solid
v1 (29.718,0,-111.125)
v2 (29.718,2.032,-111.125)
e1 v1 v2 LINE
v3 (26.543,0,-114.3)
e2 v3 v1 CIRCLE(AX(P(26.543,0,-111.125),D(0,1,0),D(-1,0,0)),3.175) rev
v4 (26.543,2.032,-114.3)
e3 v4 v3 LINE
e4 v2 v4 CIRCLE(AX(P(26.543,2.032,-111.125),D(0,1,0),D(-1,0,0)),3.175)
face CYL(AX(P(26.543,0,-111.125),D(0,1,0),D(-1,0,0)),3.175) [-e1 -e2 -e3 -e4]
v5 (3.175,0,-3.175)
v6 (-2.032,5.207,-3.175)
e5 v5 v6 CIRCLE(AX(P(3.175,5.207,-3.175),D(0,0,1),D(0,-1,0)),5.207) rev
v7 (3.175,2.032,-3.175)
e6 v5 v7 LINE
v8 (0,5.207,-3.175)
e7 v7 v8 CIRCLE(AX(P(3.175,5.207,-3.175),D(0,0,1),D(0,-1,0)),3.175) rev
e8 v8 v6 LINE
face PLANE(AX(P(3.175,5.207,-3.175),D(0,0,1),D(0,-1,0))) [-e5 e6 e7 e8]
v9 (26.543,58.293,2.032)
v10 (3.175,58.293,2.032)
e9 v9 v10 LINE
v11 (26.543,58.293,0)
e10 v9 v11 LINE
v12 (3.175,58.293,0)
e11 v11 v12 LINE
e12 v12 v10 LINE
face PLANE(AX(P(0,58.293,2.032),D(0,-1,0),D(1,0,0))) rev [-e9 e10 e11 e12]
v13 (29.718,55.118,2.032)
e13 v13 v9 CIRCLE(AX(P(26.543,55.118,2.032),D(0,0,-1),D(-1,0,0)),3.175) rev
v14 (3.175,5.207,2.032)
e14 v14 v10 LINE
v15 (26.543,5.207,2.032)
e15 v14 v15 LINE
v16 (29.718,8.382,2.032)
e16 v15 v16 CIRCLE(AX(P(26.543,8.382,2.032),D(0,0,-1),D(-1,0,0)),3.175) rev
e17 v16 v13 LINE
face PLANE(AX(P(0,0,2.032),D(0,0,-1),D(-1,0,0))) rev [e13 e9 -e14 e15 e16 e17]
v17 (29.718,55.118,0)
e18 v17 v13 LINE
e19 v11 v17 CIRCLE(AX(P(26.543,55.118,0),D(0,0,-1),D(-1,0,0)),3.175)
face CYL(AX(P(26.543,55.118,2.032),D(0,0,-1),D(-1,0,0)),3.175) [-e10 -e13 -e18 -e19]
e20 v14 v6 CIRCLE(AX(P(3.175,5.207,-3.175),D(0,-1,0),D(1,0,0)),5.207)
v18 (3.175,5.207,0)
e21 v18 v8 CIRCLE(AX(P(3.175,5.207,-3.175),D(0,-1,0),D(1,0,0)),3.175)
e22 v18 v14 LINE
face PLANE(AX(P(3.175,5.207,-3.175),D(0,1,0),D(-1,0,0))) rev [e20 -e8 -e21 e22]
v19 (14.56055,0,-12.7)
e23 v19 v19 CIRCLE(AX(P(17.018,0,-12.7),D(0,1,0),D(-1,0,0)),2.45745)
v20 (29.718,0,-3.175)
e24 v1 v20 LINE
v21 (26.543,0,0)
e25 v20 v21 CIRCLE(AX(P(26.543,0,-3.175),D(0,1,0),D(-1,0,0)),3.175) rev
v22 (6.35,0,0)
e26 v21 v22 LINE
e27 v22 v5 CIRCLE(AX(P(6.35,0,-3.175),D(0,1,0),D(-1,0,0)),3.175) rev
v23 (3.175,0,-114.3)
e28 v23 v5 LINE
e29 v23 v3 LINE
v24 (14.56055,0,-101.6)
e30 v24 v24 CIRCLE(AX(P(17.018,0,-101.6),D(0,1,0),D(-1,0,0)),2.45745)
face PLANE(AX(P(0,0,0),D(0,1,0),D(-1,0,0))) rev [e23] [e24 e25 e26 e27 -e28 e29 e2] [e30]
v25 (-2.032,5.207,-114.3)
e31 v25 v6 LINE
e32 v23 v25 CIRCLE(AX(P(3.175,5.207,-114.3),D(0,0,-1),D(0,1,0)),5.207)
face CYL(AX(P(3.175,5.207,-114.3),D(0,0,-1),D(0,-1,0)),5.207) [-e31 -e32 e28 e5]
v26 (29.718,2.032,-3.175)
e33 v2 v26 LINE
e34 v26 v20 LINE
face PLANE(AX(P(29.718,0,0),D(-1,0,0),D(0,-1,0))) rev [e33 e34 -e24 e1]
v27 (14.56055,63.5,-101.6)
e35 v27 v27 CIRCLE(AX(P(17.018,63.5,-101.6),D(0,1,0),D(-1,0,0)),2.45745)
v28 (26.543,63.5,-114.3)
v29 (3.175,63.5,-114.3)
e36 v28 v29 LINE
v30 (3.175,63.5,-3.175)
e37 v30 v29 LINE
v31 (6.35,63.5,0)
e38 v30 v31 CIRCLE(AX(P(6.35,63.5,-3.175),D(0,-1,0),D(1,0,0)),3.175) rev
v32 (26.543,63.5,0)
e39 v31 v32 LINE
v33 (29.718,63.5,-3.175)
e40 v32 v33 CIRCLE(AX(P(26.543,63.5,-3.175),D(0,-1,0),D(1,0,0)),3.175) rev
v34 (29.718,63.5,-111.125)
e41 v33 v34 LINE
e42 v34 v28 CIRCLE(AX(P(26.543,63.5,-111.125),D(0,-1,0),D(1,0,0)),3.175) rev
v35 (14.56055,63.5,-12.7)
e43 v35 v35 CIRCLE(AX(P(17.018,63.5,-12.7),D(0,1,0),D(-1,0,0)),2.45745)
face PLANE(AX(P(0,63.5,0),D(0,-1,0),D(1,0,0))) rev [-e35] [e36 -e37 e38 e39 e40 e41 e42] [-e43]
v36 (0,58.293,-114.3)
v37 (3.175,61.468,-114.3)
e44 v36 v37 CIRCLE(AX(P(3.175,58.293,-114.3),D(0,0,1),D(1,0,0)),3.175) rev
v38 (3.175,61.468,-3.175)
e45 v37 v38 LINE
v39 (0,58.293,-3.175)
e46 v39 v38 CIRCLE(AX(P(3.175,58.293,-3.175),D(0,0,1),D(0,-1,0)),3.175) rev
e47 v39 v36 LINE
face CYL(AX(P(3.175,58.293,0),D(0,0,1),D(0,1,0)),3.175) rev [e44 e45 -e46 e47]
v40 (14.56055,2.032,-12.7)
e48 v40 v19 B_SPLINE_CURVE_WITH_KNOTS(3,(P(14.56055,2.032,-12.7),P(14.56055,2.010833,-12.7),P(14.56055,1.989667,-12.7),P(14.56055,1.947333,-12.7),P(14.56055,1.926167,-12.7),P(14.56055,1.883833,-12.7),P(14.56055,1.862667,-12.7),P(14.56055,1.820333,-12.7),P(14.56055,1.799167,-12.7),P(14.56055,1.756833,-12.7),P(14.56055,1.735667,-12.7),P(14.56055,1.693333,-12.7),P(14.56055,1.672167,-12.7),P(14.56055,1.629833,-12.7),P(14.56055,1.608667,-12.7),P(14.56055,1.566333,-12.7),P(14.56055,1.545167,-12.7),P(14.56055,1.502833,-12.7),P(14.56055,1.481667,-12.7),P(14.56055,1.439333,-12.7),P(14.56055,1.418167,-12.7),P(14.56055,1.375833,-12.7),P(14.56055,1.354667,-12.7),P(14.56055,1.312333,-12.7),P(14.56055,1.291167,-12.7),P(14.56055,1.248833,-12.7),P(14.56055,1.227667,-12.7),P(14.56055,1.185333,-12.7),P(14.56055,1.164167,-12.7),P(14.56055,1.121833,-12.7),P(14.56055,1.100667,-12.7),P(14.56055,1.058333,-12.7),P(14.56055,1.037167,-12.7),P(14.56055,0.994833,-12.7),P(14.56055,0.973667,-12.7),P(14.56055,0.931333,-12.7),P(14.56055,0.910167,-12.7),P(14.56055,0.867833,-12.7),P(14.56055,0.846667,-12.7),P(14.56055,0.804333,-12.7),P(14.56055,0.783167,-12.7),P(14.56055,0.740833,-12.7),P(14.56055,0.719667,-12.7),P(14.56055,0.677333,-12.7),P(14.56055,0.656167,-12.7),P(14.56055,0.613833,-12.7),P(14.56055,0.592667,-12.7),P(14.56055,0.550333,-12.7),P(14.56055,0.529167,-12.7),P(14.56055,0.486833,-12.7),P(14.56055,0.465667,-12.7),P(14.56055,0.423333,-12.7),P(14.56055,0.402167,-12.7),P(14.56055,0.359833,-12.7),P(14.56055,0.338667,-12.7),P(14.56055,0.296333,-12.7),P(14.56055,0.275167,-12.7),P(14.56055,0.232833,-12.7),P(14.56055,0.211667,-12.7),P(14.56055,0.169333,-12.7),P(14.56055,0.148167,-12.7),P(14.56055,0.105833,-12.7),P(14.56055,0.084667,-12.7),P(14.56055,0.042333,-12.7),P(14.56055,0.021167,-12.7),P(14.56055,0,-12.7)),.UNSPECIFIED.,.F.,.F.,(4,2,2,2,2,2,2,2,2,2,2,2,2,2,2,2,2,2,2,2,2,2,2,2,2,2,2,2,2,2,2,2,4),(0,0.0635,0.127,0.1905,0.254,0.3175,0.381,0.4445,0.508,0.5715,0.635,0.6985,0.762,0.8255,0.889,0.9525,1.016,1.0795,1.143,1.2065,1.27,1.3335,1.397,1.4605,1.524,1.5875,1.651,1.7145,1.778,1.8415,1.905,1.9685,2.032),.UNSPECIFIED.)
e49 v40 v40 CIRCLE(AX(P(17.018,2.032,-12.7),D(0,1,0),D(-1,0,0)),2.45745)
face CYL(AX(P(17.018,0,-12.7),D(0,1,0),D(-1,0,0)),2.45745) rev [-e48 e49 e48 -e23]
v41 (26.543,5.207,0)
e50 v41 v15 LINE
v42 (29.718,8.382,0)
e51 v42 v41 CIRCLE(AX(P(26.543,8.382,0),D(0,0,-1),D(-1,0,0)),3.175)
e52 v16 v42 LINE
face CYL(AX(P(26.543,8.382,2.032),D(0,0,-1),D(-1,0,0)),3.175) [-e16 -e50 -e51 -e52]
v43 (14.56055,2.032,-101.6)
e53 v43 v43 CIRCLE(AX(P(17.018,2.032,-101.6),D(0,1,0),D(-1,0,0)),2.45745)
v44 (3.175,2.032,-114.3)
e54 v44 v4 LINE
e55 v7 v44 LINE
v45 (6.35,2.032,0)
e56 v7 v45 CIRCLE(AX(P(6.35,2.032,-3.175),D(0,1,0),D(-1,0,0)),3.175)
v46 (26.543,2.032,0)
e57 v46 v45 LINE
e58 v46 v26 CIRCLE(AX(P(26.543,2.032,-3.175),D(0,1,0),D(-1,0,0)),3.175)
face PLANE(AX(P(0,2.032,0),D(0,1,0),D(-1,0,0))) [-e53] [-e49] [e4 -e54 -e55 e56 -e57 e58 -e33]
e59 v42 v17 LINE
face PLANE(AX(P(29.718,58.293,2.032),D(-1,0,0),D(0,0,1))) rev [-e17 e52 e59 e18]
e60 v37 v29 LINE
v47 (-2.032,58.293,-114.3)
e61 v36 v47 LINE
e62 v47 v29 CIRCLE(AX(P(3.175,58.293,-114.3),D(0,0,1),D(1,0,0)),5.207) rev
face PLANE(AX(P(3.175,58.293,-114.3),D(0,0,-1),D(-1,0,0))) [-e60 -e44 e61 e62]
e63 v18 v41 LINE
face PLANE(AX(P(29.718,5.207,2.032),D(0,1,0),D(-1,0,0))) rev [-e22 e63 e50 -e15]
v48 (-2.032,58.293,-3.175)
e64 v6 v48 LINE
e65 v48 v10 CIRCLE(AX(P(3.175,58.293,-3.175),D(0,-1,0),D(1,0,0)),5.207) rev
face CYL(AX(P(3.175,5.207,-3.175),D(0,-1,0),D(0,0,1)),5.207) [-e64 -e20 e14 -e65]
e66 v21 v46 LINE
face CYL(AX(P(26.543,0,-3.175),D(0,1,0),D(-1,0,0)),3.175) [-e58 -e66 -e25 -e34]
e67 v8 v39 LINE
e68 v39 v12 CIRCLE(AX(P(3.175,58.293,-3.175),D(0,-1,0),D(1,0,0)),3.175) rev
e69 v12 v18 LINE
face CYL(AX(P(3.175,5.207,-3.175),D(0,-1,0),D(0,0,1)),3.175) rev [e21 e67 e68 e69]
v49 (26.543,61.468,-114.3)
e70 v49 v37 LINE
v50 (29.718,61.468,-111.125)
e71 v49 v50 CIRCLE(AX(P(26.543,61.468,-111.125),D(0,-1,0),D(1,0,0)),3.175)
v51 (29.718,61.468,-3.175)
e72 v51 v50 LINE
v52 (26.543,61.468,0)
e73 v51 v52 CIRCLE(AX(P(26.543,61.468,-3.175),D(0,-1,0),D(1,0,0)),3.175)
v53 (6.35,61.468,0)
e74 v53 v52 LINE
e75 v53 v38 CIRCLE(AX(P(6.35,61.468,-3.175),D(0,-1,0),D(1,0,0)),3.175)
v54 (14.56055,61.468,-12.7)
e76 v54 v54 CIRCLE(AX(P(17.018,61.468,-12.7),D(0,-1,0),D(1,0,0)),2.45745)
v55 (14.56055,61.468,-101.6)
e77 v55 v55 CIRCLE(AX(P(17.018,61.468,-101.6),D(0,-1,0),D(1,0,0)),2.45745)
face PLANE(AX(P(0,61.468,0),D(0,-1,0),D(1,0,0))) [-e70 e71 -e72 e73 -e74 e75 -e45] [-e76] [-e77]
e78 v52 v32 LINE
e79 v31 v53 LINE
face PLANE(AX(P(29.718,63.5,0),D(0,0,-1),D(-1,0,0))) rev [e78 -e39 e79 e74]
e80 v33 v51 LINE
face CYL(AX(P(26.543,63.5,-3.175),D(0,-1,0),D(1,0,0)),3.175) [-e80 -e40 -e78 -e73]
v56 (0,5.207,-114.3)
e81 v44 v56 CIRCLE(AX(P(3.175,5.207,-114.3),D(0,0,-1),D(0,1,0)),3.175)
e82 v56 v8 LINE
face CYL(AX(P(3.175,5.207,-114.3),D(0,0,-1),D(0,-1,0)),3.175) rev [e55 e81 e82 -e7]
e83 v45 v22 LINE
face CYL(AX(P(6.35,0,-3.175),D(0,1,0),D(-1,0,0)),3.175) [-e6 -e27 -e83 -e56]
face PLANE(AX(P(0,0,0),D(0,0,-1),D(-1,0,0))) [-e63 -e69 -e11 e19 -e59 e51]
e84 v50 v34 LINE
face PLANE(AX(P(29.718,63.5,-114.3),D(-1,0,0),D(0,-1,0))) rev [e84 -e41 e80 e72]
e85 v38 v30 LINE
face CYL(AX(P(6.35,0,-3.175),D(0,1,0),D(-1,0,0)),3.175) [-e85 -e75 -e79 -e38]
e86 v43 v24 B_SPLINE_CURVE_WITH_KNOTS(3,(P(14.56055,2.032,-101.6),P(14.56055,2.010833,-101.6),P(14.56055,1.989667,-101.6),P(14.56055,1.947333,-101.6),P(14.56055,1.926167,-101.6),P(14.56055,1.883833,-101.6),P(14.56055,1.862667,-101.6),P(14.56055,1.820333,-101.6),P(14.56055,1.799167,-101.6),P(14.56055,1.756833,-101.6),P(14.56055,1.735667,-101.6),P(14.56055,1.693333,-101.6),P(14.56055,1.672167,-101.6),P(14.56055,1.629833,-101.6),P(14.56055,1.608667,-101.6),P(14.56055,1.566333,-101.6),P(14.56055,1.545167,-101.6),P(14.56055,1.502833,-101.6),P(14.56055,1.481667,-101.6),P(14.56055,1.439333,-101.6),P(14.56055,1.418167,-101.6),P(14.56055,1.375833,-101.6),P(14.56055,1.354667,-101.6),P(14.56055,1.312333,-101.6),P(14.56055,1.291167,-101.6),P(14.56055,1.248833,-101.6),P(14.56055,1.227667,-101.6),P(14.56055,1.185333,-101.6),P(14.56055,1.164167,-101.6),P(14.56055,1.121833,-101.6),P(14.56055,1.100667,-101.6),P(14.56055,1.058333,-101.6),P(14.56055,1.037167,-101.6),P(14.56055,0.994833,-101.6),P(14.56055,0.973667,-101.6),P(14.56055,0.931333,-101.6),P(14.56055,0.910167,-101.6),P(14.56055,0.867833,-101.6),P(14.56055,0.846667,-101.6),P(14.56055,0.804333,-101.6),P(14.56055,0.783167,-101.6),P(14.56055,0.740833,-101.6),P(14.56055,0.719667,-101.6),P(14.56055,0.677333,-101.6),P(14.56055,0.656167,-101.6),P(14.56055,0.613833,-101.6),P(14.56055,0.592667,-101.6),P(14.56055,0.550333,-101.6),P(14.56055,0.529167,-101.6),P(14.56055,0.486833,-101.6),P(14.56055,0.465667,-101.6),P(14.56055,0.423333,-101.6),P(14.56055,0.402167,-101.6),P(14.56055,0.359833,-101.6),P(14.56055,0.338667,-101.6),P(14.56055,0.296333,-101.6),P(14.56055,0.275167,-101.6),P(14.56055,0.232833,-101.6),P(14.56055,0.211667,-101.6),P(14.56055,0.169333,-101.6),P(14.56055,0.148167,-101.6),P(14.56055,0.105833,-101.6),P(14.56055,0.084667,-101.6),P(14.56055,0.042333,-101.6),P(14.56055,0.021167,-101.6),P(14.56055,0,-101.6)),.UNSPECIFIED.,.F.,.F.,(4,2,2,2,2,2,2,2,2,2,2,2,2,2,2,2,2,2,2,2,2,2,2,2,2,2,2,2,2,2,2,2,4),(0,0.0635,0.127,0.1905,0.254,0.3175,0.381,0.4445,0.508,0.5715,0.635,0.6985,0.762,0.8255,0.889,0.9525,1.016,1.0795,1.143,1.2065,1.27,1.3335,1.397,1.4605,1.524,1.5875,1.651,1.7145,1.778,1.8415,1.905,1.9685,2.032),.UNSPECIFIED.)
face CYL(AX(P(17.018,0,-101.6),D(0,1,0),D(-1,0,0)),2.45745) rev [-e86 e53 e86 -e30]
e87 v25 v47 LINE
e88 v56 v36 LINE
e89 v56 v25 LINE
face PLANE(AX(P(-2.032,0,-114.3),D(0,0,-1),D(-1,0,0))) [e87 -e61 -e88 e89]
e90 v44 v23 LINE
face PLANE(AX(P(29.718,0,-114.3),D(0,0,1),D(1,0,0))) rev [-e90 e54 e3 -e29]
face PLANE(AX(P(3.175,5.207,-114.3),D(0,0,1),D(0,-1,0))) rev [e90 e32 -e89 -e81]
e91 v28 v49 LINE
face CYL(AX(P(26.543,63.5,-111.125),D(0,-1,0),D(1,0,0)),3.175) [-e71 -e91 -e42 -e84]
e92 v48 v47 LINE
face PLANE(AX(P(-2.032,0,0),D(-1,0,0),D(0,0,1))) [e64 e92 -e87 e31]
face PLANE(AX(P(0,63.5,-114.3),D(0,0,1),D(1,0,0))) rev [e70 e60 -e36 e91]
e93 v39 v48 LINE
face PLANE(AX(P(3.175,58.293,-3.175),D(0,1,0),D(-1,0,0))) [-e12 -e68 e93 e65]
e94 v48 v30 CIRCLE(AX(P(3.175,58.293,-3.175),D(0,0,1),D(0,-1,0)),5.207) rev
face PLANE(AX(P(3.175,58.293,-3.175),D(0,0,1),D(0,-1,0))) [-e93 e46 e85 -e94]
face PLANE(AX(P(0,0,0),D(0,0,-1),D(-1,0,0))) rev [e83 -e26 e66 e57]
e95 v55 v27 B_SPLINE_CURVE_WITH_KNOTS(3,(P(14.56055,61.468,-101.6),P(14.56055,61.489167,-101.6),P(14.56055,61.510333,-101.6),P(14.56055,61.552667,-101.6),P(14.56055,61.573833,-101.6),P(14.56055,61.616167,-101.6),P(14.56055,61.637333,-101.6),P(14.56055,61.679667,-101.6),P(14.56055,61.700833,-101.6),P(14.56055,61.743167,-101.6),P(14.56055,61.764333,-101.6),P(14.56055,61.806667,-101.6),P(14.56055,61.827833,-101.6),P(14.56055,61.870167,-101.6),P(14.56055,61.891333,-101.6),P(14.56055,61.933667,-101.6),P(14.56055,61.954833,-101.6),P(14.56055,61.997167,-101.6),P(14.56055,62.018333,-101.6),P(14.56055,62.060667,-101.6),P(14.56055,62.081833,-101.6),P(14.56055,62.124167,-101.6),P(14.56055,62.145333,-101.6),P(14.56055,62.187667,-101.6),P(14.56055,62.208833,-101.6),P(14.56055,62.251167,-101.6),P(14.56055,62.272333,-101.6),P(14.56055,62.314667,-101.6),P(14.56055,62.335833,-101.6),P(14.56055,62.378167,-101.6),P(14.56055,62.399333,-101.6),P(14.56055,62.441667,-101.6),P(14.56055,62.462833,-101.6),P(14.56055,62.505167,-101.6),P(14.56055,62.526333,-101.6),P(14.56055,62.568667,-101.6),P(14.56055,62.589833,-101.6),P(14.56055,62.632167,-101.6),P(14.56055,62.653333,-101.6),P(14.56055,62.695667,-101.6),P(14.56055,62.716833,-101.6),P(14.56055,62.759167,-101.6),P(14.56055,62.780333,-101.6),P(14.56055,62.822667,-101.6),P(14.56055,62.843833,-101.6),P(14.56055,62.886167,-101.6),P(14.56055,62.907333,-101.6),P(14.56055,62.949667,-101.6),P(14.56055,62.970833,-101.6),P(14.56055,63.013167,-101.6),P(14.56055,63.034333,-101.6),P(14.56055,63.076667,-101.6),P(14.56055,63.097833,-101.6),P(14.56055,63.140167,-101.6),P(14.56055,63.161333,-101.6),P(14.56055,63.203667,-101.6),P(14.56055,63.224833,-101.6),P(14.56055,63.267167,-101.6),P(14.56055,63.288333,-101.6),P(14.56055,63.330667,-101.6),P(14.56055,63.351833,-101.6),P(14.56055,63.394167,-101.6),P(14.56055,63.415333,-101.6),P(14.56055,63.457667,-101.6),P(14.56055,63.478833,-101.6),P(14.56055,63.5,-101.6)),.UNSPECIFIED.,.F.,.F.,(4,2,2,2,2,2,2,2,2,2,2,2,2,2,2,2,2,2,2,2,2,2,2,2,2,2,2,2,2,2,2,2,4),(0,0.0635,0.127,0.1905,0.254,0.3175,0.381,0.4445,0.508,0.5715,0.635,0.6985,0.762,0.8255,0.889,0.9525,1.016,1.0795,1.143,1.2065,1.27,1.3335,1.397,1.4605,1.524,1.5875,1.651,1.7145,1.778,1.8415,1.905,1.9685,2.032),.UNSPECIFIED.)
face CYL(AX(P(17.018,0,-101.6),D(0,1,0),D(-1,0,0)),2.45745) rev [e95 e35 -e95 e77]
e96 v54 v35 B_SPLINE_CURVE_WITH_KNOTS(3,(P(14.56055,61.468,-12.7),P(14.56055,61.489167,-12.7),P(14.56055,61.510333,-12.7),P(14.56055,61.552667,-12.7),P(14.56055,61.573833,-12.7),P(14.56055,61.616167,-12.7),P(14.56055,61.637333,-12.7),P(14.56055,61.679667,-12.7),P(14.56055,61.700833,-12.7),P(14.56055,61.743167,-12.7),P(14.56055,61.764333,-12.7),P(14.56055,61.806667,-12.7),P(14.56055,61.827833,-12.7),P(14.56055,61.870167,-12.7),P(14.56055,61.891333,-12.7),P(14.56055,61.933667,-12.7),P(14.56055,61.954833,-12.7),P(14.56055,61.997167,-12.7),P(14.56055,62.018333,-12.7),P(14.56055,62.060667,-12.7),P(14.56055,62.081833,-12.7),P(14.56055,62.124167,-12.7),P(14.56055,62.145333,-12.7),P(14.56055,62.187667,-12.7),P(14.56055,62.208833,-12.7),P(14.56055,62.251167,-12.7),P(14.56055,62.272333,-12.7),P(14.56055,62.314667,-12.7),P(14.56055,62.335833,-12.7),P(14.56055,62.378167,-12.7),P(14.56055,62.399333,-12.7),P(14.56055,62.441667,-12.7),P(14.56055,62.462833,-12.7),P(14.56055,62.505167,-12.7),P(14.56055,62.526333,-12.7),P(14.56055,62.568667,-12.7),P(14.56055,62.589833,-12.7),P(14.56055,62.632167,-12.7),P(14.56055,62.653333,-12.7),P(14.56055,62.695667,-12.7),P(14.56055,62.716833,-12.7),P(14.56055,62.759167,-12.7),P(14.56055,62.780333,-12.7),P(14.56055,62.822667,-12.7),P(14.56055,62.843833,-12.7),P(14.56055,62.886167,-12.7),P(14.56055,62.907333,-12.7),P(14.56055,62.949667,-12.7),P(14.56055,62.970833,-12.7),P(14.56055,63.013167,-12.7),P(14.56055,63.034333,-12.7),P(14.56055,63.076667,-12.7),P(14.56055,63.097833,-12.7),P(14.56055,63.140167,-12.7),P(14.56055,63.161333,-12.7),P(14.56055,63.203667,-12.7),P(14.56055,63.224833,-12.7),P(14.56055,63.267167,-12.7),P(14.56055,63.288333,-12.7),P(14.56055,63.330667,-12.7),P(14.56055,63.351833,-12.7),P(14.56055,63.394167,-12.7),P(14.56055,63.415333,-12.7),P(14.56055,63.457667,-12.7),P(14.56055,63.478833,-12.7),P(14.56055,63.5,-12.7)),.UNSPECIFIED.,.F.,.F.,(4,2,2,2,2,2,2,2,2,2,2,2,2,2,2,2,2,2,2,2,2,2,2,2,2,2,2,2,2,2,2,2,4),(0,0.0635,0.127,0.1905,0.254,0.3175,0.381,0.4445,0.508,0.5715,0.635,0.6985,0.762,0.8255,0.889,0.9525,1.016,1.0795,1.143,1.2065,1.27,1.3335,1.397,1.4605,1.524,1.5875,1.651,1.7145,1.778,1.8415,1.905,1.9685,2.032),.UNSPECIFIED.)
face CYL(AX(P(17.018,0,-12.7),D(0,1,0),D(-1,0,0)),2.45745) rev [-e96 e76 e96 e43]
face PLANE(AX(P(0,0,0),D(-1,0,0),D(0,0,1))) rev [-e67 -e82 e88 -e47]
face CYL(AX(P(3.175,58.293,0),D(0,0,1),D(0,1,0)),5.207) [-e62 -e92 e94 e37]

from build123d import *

# Parameters (mm, degrees)
SKETCH1_W                      = 114.3
SKETCH1_H                      = 63.5
BASE_FLANGE1_DEPTH             = 2.032
EDGE_FLANGE1_STRIP_W           = 14.478
EDGE_FLANGE1_STRIP_H           = 2.032
EDGE_FLANGE1_STRIP_CUT_DEPTH   = 114.3
EDGE_FLANGE1_STRIP_2_W         = 14.478
EDGE_FLANGE1_STRIP_2_H         = 2.032
EDGE_FLANGE1_STRIP_CUT_2_DEPTH = 114.3
EDGE_FLANGE1_DEPTH             = 114.3
EDGE_FLANGE1_BEND_DEPTH        = 114.3
EDGE_FLANGE2_DEPTH             = 63.5
EDGE_FLANGE2_2_DEPTH           = 5.207
EDGE_FLANGE2_START             = 58.293
EDGE_FLANGE2_3_DEPTH           = 5.207
EDGE_FLANGE2_START_2           = 5.207
EDGE_FLANGE2_4_DEPTH           = 53.086
SKETCH15_R                     = 2.45745
CUT_EXTRUDE1_DEPTH             = 135.089147674
FILLET1_R                      = 3.175


# Read off the part's stored shape, not the designer's step: Edge-Flange2
# Sheet-metal steps are written as plain solids
with BuildPart() as part:
    # Sketch1 → Base-Flange1 (new body)
    with BuildSketch(Plane(origin=(0, 0, 0), x_dir=(0, 0, -1), z_dir=(1, 0, 0))):
        with Locations((57.15, 31.75)):
            Rectangle(SKETCH1_W, SKETCH1_H)
    extrude(amount=-BASE_FLANGE1_DEPTH)

    # Edge-Flange1 strip (across the edge) → Edge-Flange1 strip cut (cut)
    with BuildSketch(Plane(origin=(0, 63.5, -114.3), x_dir=(0, -1, 0), z_dir=(0, 0, 1))):
        with Locations((-2.032, -1.016)):
            Rectangle(EDGE_FLANGE1_STRIP_W, EDGE_FLANGE1_STRIP_H)
    extrude(amount=EDGE_FLANGE1_STRIP_CUT_DEPTH, mode=Mode.SUBTRACT)

    # Edge-Flange1 strip 2 (across the edge) → Edge-Flange1 strip cut 2 (cut)
    with BuildSketch(Plane.YX):
        with Locations((-2.032, -1.016)):
            Rectangle(EDGE_FLANGE1_STRIP_2_W, EDGE_FLANGE1_STRIP_2_H)
    extrude(amount=EDGE_FLANGE1_STRIP_CUT_2_DEPTH, mode=Mode.SUBTRACT)

    # Edge-Flange1 section (across the edge) → Edge-Flange1 (add)
    with BuildSketch(Plane(origin=(0, 63.5, -114.3), x_dir=(0, -1, 0), z_dir=(0, 0, 1))):
        with BuildLine():
            Line((0, 3.175), (0, 29.718))
            Line((0, 29.718), (2.032, 29.718))
            Line((2.032, 29.718), (2.032, 3.175))
            ThreePointArc((2.032, 3.175), (2.96193597, 0.92993597), (5.207, 0))
            Line((5.207, 0), (5.207, -2.032))
            ThreePointArc((5.207, -2.032), (1.52509499, -0.50690501), (0, 3.175))
        make_face()
    extrude(amount=EDGE_FLANGE1_DEPTH)

    # Edge-Flange1 section 2 (across the edge) → Edge-Flange1 bend (add)
    with BuildSketch(Plane.YX):
        with BuildLine():
            Line((0, 3.175), (0, 29.718))
            Line((0, 29.718), (2.032, 29.718))
            Line((2.032, 29.718), (2.032, 3.175))
            ThreePointArc((2.032, 3.175), (2.96193597, 0.92993597), (5.207, 0))
            Line((5.207, 0), (5.207, -2.032))
            ThreePointArc((5.207, -2.032), (1.52509499, -0.50690501), (0, 3.175))
        make_face()
    extrude(amount=EDGE_FLANGE1_BEND_DEPTH)

    # Edge-Flange2 outline → Edge-Flange2 (cut)
    with BuildSketch(Plane(origin=(0, 0, 0), x_dir=(1, 0, 0), z_dir=(0, 1, 0))):
        with BuildLine():
            Line((3.175, 0), (3.175, 3.175))
            Line((3.175, 3.175), (0, 3.175))
            ThreePointArc((0, 3.175), (0.92993597, 0.92993597), (3.175, 0))
        make_face()
        with BuildLine():
            ThreePointArc((-0.95201151, 0), (-1.754614485, 1.498172628), (-2.032, 3.175))
            Line((-2.032, 3.175), (-2.032, 0))
            Line((-2.032, 0), (-0.95201151, 0))
        make_face()
    extrude(amount=EDGE_FLANGE2_DEPTH, mode=Mode.SUBTRACT)

    # Edge-Flange2 2 outline → Edge-Flange2 2 (cut)
    with BuildSketch(Plane(origin=(0, 0, 0), x_dir=(1, 0, 0), z_dir=(0, 1, 0))):
        with BuildLine():
            ThreePointArc((3.175, 0), (0.92993597, 0.92993597), (0, 3.175))
            Line((0, 3.175), (-2.032, 3.175))
            ThreePointArc((-2.032, 3.175), (-1.754614485, 1.498172628), (-0.95201151, 0))
            Line((-0.95201151, 0), (3.175, 0))
        make_face()
    extrude(amount=EDGE_FLANGE2_2_DEPTH, mode=Mode.SUBTRACT)

    # Edge-Flange2 3 outline → Edge-Flange2 3 (cut)
    with BuildSketch(Plane(origin=(0, 0, 0), x_dir=(1, 0, 0), z_dir=(0, 1, 0)).offset(EDGE_FLANGE2_START)):
        with BuildLine():
            ThreePointArc((3.175, 0), (0.92993597, 0.92993597), (0, 3.175))
            Line((0, 3.175), (-2.032, 3.175))
            ThreePointArc((-2.032, 3.175), (-1.754614485, 1.498172628), (-0.95201151, 0))
            Line((-0.95201151, 0), (3.175, 0))
        make_face()
    extrude(amount=EDGE_FLANGE2_3_DEPTH, mode=Mode.SUBTRACT)

    # Edge-Flange2 4 outline → Edge-Flange2 4 (add)
    with BuildSketch(Plane(origin=(0, 0, 0), x_dir=(1, 0, 0), z_dir=(0, 1, 0)).offset(EDGE_FLANGE2_START_2)):
        with BuildLine():
            Line((0, 3.175), (0, 0))
            Line((0, 0), (-0.95201151, 0))
            ThreePointArc((-0.95201151, 0), (0.874932175, -1.496459836), (3.175, -2.032))
            Line((3.175, -2.032), (29.718, -2.032))
            Line((29.718, -2.032), (29.718, 0))
            Line((29.718, 0), (3.175, 0))
            ThreePointArc((3.175, 0), (0.92993597, 0.92993597), (0, 3.175))
        make_face()
    extrude(amount=EDGE_FLANGE2_4_DEPTH)

    # Sketch15 → Cut-Extrude1 (cut, through all)
    with BuildSketch(Plane(origin=(0, 63.5, 0), x_dir=(1, 0, 0), z_dir=(0, 1, 0))):
        with Locations(Location((17.018, 101.6, 0), (0, 0, 180))):
            Circle(SKETCH15_R)
        with Locations(Location((17.018, 12.7, 0), (0, 0, 180))):
            Circle(SKETCH15_R)
    extrude(amount=-CUT_EXTRUDE1_DEPTH, mode=Mode.SUBTRACT)

    # Fillet1
    fillet1_edges = [part.edges().sort_by_distance(p)[0] for p in [
        (29.718, 1.016, -114.3),
        (29.718, 62.484, -114.3),
        (3.175, 1.016, 0),
        (29.718, 1.016, 0),
        (29.718, 5.207, 1.016),
        (29.718, 58.293, 1.016),
        (29.718, 62.484, 0),
        (3.175, 62.484, 0),
    ]]
    fillet(fillet1_edges, radius=FILLET1_R - 0.0001)  # a hair under: the kernel refuses the full size


solid = part.part
